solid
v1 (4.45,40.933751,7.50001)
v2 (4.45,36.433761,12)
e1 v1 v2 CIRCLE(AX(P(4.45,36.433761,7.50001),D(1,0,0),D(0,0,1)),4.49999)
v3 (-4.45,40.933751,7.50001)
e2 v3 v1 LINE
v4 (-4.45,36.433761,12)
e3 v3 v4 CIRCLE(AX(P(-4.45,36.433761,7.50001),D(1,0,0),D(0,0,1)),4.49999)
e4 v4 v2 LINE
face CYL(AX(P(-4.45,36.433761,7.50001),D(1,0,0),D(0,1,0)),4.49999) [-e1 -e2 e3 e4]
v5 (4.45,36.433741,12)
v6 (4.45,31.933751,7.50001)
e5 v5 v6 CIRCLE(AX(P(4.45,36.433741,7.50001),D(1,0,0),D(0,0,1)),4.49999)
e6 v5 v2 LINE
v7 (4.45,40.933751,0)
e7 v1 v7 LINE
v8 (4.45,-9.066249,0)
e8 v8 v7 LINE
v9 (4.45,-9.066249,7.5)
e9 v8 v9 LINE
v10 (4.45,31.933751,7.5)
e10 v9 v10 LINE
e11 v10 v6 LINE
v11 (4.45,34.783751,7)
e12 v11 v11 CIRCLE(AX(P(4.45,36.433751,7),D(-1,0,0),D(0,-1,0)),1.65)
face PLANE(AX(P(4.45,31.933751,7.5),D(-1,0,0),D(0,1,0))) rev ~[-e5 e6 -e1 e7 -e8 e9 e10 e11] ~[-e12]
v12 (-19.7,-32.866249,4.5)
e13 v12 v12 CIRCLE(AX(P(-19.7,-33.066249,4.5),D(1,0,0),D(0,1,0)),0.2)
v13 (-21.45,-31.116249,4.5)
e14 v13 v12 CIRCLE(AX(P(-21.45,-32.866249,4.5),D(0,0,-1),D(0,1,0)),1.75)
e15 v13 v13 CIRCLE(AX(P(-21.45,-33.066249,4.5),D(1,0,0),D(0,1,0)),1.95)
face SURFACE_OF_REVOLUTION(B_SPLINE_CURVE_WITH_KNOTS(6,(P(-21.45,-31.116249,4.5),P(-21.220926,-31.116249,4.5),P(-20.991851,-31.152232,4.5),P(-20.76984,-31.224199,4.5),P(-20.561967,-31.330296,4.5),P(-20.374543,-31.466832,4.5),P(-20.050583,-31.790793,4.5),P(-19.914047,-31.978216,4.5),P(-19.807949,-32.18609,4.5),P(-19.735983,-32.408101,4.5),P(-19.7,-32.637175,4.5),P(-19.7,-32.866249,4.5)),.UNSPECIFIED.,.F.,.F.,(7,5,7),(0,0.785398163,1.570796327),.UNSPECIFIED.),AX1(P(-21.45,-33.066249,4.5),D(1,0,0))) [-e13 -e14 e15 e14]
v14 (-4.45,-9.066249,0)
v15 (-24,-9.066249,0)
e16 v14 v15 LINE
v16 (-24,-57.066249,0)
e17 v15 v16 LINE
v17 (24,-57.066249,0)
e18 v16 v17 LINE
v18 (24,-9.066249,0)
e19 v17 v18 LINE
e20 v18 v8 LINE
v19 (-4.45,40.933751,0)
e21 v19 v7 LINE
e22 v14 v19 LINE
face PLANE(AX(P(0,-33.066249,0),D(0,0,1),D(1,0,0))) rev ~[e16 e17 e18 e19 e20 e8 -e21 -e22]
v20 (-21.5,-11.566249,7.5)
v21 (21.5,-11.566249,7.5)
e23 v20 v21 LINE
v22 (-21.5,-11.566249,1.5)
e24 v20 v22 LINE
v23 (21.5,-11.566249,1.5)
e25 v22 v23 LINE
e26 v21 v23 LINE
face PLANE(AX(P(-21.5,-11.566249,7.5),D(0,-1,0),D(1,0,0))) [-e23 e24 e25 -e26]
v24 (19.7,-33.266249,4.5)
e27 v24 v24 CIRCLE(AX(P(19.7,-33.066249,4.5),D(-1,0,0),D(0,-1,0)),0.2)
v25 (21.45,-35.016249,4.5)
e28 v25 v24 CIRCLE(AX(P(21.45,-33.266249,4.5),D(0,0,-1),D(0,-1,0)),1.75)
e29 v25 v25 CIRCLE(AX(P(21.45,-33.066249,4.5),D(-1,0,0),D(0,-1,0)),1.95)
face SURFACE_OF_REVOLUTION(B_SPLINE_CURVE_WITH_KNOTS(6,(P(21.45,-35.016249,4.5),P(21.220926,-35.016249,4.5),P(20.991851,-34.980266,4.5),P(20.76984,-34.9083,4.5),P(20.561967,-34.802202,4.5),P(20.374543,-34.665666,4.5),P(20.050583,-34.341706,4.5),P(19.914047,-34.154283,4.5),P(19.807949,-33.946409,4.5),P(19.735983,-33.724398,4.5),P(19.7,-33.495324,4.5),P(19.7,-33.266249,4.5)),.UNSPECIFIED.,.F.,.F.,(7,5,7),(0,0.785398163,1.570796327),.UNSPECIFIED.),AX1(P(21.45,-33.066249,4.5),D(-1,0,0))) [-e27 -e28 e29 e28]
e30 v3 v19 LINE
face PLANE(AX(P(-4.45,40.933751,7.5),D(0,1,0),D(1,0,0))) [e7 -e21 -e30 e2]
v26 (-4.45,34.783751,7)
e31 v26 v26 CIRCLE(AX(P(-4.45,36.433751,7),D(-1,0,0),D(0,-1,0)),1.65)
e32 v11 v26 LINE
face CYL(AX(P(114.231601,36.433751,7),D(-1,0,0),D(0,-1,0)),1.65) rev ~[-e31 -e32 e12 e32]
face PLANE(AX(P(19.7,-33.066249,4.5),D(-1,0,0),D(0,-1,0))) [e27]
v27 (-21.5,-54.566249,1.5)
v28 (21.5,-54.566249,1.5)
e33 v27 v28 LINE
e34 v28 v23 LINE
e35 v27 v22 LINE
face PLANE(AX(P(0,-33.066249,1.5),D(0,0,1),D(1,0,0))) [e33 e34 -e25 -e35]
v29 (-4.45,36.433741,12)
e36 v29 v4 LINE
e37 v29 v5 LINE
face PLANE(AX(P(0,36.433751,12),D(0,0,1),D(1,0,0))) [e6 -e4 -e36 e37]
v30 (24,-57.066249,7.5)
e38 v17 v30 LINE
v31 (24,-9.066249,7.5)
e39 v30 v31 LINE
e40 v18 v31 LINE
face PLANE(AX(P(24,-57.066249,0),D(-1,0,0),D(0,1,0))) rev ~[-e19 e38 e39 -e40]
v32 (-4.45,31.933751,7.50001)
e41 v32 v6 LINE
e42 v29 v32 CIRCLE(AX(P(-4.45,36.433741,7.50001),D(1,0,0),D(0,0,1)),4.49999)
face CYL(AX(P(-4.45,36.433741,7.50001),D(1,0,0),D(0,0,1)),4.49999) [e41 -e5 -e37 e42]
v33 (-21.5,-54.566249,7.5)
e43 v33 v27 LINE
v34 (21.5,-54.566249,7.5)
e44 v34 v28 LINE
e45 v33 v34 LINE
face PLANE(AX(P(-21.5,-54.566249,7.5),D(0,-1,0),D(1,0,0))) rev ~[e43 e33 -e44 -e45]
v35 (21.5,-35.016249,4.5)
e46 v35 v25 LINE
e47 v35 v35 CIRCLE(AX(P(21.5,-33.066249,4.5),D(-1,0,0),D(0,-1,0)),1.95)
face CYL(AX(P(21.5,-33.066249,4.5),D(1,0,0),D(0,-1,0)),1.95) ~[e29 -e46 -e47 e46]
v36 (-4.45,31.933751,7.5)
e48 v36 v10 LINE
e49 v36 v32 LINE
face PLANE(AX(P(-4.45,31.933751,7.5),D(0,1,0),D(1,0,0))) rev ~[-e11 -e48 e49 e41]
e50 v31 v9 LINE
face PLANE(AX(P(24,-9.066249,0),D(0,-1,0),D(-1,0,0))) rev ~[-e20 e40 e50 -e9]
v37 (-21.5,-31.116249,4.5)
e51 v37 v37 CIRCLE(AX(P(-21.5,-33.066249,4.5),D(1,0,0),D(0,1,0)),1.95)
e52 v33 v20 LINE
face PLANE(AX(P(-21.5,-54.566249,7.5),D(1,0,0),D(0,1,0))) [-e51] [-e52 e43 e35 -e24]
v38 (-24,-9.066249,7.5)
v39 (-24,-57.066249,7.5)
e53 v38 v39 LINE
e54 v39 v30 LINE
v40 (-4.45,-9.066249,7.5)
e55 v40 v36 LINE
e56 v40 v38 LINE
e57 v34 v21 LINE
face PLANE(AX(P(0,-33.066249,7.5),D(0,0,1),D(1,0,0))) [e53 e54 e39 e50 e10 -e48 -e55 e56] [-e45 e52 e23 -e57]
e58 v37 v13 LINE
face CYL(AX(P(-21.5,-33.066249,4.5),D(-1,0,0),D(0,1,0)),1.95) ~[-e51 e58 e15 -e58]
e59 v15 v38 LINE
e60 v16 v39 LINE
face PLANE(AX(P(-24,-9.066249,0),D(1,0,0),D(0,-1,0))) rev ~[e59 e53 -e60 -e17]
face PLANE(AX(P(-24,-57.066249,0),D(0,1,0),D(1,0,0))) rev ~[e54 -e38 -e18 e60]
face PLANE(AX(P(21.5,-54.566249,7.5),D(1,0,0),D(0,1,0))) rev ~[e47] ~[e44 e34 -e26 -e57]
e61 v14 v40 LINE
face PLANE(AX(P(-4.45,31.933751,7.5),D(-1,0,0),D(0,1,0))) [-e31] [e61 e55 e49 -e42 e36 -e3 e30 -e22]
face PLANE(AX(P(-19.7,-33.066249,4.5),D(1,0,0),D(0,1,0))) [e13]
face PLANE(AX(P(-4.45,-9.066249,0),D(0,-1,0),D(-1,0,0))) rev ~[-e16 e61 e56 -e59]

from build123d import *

# Parameters (mm, degrees)
F0_W      = 8.9
F0_H      = 50
F1_DEPTH  = 7.5
F2_W      = 43
F2_H      = 43
F3_DEPTH  = 6
F4_W      = 8.9
F4_H      = 9
F5_DEPTH  = 4.5
F6_R      = 4.49999
F7_R      = 1.95
F8_DEPTH  = 1.8
F9_R      = 1.95
F10_DEPTH = 1.8
F12_D     = 3.3
F13_R     = 1.75


# Not quite as in the source:
# - a fillet or chamfer is up to 0.001 mm smaller than in the source, because OpenCascade refuses the exact size
# - a feature names something its author has since deleted; it is built from what else it names


with BuildPart() as f1:
    # F0 (on Top) → F1 (new body)
    with BuildSketch(Plane.XY):
        Polygon((-4.45, -9.0662492651), (-24, -9.0662492651), (-24, -57.0662492651), (24, -57.0662492651), (24, -9.0662492651), (4.45, -9.0662492651), align=None)
        with Locations((0, 15.9337507349)):
            Rectangle(F0_W, F0_H)
    extrude(amount=F1_DEPTH)

    # F2 (on face) → F3 (cut)
    with BuildSketch(Plane.XY.offset(7.5)):
        with Locations((0, -33.0662492651)):
            Rectangle(F2_W, F2_H)
    extrude(amount=-F3_DEPTH, mode=Mode.SUBTRACT)

    # F4 (on face) → F5 (join)
    with BuildSketch(Plane.XY.offset(7.5)):
        with Locations((0, 36.4337507349)):
            Rectangle(F4_W, F4_H)
    extrude(amount=F5_DEPTH)

    # F6 (radius 4.5 in the source; OpenCascade refuses exactly that, so slightly less here)
    f6_edges = [f1.edges().sort_by_distance(p)[0] for p in [
        (0, 40.933751, 12),
        (0, 31.933751, 12),
    ]]
    fillet(f6_edges, radius=F6_R)

    # F7 (on face) → F8 (join)
    with BuildSketch(Plane(origin=(21.5, 0, 0), x_dir=(0, -1, 0), z_dir=(-1, 0, 0))):
        with Locations((33.0662492651, 4.5)):
            Circle(F7_R)
    extrude(amount=F8_DEPTH)

    # F9 (on face) → F10 (join)
    with BuildSketch(Plane.YZ.offset(-21.5)):
        with Locations((-33.0662492651, 4.5)):
            Circle(F9_R)
    extrude(amount=F10_DEPTH)

    # F12 (through all)
    with Locations(Plane.YZ.offset(4.45)):
        with Locations((36.4337507349, 7)):
            Hole(F12_D / 2)

    # F13
    f13_edges = [f1.edges().sort_by_distance(p)[0] for p in [
        (-19.7, -35.016249, 4.5),
        (19.7, -31.116249, 4.5),
    ]]
    fillet(f13_edges, radius=F13_R)


solid = f1.part
